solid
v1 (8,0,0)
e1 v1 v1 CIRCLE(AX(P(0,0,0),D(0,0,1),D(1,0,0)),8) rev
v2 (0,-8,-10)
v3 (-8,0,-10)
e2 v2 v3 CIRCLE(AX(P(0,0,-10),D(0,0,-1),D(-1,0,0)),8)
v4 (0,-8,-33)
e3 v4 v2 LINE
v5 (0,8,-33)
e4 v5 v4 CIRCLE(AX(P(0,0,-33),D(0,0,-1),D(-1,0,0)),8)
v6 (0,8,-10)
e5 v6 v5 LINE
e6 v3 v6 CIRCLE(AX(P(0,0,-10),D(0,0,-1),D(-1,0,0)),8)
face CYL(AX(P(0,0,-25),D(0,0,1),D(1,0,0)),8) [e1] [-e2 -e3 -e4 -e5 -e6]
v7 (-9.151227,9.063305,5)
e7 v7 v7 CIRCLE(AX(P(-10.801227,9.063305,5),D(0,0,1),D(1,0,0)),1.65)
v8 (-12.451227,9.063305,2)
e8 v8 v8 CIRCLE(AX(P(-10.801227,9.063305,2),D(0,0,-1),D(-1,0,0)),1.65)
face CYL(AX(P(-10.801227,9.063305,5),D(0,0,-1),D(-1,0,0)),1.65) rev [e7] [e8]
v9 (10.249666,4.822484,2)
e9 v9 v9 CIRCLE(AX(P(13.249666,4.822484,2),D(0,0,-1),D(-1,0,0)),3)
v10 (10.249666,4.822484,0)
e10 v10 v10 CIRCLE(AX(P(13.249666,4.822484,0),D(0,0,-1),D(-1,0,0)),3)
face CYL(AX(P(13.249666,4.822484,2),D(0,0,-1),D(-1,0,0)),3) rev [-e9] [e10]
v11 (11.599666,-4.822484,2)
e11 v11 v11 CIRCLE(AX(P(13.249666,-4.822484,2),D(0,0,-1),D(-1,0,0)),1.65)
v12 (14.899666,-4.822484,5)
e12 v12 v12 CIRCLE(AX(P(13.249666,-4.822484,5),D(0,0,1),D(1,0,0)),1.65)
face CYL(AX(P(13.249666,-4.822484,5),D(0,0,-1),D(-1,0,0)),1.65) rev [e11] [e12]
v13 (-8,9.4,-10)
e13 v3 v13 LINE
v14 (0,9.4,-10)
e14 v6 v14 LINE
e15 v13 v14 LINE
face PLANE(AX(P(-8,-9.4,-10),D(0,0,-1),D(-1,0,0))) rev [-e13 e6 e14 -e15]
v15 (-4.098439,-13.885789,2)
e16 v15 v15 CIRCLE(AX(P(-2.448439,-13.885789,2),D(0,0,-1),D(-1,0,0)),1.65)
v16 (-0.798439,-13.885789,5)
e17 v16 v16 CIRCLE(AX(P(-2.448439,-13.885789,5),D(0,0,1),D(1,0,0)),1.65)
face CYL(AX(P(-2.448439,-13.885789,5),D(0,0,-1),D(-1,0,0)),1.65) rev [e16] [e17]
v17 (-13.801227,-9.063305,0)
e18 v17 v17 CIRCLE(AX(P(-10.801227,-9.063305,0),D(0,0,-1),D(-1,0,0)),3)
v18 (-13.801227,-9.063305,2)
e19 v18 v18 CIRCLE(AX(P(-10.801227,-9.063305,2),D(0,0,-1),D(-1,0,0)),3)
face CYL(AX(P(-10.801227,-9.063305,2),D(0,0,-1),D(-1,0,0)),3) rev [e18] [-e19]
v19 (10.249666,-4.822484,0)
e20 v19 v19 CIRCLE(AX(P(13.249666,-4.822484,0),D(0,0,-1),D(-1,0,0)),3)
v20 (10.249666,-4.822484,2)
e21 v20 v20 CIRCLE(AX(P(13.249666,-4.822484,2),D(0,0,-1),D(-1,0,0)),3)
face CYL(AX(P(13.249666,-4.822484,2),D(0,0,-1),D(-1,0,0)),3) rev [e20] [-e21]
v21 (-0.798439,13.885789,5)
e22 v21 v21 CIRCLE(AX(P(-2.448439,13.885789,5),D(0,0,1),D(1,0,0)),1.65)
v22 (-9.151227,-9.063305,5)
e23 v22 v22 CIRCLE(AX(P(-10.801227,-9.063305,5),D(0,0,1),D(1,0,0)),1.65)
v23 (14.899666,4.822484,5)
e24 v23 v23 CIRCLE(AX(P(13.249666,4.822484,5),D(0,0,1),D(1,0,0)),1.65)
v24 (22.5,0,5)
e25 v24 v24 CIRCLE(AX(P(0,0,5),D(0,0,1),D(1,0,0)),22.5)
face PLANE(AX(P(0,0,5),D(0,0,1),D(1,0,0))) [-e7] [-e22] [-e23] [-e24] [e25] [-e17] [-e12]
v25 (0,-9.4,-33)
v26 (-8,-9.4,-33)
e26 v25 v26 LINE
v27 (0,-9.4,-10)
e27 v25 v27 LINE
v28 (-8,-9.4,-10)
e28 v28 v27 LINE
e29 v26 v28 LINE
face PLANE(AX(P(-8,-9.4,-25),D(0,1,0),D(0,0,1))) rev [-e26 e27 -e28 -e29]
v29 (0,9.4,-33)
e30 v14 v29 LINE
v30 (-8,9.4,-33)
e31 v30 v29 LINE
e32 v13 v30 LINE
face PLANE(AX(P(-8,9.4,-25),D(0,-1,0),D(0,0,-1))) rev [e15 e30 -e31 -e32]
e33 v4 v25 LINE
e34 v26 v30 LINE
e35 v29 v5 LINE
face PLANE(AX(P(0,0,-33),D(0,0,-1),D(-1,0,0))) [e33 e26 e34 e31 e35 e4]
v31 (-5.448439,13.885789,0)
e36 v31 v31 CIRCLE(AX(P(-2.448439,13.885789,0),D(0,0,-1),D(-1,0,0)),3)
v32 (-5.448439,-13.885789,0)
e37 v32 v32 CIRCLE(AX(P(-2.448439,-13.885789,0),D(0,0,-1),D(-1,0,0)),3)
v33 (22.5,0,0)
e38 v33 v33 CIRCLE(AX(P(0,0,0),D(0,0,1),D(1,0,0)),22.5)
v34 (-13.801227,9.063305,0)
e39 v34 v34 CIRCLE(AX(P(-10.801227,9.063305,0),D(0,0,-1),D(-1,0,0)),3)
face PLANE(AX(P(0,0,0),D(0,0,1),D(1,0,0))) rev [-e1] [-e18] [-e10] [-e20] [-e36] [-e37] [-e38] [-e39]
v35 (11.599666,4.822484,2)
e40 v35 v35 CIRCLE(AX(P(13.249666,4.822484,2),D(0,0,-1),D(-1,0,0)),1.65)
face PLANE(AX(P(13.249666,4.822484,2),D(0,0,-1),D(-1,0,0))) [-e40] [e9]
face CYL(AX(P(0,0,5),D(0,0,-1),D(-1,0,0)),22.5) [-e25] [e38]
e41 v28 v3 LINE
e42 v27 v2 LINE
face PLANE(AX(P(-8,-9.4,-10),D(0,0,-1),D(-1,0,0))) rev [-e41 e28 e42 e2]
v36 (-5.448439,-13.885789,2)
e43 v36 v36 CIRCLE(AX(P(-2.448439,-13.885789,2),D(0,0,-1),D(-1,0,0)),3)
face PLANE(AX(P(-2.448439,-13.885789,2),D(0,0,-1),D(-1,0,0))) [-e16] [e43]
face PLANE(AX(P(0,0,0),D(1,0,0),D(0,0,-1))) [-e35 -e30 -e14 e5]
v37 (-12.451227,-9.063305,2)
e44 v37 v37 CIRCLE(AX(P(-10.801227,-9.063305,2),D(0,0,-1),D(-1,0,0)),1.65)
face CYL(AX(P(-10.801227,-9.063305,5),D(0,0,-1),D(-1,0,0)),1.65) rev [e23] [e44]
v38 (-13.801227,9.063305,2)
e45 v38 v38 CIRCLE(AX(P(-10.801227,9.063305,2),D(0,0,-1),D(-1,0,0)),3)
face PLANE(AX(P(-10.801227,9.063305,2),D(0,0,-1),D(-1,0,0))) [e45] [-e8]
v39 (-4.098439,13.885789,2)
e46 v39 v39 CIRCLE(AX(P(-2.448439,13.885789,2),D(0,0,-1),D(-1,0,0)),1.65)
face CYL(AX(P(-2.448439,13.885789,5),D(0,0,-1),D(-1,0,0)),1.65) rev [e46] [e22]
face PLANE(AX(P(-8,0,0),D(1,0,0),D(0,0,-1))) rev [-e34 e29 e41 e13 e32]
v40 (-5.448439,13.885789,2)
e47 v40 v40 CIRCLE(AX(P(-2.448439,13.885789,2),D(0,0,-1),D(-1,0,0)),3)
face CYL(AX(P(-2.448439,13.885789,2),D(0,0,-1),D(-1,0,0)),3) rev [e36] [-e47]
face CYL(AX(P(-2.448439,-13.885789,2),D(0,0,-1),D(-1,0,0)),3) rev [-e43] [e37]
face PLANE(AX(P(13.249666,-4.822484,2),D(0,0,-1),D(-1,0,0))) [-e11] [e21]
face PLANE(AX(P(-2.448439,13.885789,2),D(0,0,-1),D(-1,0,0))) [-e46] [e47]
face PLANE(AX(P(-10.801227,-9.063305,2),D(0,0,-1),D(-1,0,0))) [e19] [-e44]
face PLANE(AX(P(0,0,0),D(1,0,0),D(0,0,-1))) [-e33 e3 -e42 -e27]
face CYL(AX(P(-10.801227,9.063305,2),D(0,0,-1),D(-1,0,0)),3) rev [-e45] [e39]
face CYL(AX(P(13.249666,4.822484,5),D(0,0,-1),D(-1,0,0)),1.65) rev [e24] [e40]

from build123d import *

# Parameters (mm, degrees)
SKETCH_1_R               = 22.5
SKETCH_1_R_2             = 1.65
EXTRUDE_1_DEPTH          = 5
SKETCH_3_R               = 3
CUT_EXTRUDE_1_DEPTH      = 2
SKETCH_11_R              = 8
EXTRUDE_2_DEPTH          = 25
CUT_EXTRUDE_9_DEPTH      = 25
CUT_EXTRUDE_9_DEPTH_BACK = 25
SKETCH_12_W              = 8
SKETCH_12_H              = 15
SKETCH_13_W              = 15
SKETCH_13_H              = 18.8
EXTRUDE_3_DEPTH          = 8
EXTRUDE_5_DEPTH          = 8


with BuildPart() as part:
    # 스케치1 → 보스-돌출1 (new body)
    with BuildSketch(Plane.XY):
        Circle(SKETCH_1_R)
        with Locations((-2.448439305, 13.885789317)):
            Circle(SKETCH_1_R_2, mode=Mode.SUBTRACT)
        with Locations((-10.801226648, 9.063305297)):
            Circle(SKETCH_1_R_2, mode=Mode.SUBTRACT)
        with Locations((13.249665953, 4.822484021)):
            Circle(SKETCH_1_R_2, mode=Mode.SUBTRACT)
        with Locations((13.249665953, -4.822484021)):
            Circle(SKETCH_1_R_2, mode=Mode.SUBTRACT)
        with Locations((-2.448439305, -13.885789317)):
            Circle(SKETCH_1_R_2, mode=Mode.SUBTRACT)
        with Locations((-10.801226648, -9.063305297)):
            Circle(SKETCH_1_R_2, mode=Mode.SUBTRACT)
    extrude(amount=EXTRUDE_1_DEPTH)

    # 스케치3 → 컷-돌출1 (cut)
    with BuildSketch(Plane(origin=(0, 0, 0), x_dir=(-1, 0, 0), z_dir=(0, 0, -1))):
        with Locations((2.448439305, 13.885789317)):
            Circle(SKETCH_3_R)
        with Locations((10.801226648, 9.063305297)):
            Circle(SKETCH_3_R)
        with Locations((10.801226648, -9.063305297)):
            Circle(SKETCH_3_R)
        with Locations((2.448439305, -13.885789317)):
            Circle(SKETCH_3_R)
        with Locations((-13.249665953, -4.822484021)):
            Circle(SKETCH_3_R)
        with Locations((-13.249665953, 4.822484021)):
            Circle(SKETCH_3_R)
    extrude(amount=-CUT_EXTRUDE_1_DEPTH, mode=Mode.SUBTRACT)

    # 스케치11 → 보스-돌출2 (add)
    with BuildSketch(Plane(origin=(0, 0, 0), x_dir=(-1, 0, 0), z_dir=(0, 0, -1))):
        Circle(SKETCH_11_R)
    extrude(amount=EXTRUDE_2_DEPTH)

    # 스케치12 → 컷-돌출9 (cut, two sides: drawn at the far end of the back side and taken through both)
    with BuildSketch(Plane(origin=(0, 0, 0), x_dir=(1, 0, 0), z_dir=(0, 1, 0)).offset(-CUT_EXTRUDE_9_DEPTH_BACK)):
        with Locations((-4, 17.5)):
            Rectangle(SKETCH_12_W, SKETCH_12_H)
    extrude(amount=CUT_EXTRUDE_9_DEPTH + CUT_EXTRUDE_9_DEPTH_BACK, mode=Mode.SUBTRACT)

    # 스케치13 → 보스-돌출3 (add)
    with BuildSketch(Plane.ZY):
        with Locations((-17.5, 0)):
            Rectangle(SKETCH_13_W, SKETCH_13_H)
    extrude(amount=EXTRUDE_3_DEPTH)

    # 스케치15 → 보스-돌출5 (add)
    with BuildSketch(Plane(origin=(0, 0, -25), x_dir=(-1, 0, 0), z_dir=(0, 0, -1))):
        with BuildLine():
            Line((0, 8), (0, 9.4))
            Line((0, 9.4), (8, 9.4))
            Line((8, 9.4), (8, -9.4))
            Line((8, -9.4), (0, -9.4))
            Line((0, -9.4), (0, -8))
            ThreePointArc((0, -8), (-8, 0), (0, 8))
        make_face()
    extrude(amount=EXTRUDE_5_DEPTH)


solid = part.part
